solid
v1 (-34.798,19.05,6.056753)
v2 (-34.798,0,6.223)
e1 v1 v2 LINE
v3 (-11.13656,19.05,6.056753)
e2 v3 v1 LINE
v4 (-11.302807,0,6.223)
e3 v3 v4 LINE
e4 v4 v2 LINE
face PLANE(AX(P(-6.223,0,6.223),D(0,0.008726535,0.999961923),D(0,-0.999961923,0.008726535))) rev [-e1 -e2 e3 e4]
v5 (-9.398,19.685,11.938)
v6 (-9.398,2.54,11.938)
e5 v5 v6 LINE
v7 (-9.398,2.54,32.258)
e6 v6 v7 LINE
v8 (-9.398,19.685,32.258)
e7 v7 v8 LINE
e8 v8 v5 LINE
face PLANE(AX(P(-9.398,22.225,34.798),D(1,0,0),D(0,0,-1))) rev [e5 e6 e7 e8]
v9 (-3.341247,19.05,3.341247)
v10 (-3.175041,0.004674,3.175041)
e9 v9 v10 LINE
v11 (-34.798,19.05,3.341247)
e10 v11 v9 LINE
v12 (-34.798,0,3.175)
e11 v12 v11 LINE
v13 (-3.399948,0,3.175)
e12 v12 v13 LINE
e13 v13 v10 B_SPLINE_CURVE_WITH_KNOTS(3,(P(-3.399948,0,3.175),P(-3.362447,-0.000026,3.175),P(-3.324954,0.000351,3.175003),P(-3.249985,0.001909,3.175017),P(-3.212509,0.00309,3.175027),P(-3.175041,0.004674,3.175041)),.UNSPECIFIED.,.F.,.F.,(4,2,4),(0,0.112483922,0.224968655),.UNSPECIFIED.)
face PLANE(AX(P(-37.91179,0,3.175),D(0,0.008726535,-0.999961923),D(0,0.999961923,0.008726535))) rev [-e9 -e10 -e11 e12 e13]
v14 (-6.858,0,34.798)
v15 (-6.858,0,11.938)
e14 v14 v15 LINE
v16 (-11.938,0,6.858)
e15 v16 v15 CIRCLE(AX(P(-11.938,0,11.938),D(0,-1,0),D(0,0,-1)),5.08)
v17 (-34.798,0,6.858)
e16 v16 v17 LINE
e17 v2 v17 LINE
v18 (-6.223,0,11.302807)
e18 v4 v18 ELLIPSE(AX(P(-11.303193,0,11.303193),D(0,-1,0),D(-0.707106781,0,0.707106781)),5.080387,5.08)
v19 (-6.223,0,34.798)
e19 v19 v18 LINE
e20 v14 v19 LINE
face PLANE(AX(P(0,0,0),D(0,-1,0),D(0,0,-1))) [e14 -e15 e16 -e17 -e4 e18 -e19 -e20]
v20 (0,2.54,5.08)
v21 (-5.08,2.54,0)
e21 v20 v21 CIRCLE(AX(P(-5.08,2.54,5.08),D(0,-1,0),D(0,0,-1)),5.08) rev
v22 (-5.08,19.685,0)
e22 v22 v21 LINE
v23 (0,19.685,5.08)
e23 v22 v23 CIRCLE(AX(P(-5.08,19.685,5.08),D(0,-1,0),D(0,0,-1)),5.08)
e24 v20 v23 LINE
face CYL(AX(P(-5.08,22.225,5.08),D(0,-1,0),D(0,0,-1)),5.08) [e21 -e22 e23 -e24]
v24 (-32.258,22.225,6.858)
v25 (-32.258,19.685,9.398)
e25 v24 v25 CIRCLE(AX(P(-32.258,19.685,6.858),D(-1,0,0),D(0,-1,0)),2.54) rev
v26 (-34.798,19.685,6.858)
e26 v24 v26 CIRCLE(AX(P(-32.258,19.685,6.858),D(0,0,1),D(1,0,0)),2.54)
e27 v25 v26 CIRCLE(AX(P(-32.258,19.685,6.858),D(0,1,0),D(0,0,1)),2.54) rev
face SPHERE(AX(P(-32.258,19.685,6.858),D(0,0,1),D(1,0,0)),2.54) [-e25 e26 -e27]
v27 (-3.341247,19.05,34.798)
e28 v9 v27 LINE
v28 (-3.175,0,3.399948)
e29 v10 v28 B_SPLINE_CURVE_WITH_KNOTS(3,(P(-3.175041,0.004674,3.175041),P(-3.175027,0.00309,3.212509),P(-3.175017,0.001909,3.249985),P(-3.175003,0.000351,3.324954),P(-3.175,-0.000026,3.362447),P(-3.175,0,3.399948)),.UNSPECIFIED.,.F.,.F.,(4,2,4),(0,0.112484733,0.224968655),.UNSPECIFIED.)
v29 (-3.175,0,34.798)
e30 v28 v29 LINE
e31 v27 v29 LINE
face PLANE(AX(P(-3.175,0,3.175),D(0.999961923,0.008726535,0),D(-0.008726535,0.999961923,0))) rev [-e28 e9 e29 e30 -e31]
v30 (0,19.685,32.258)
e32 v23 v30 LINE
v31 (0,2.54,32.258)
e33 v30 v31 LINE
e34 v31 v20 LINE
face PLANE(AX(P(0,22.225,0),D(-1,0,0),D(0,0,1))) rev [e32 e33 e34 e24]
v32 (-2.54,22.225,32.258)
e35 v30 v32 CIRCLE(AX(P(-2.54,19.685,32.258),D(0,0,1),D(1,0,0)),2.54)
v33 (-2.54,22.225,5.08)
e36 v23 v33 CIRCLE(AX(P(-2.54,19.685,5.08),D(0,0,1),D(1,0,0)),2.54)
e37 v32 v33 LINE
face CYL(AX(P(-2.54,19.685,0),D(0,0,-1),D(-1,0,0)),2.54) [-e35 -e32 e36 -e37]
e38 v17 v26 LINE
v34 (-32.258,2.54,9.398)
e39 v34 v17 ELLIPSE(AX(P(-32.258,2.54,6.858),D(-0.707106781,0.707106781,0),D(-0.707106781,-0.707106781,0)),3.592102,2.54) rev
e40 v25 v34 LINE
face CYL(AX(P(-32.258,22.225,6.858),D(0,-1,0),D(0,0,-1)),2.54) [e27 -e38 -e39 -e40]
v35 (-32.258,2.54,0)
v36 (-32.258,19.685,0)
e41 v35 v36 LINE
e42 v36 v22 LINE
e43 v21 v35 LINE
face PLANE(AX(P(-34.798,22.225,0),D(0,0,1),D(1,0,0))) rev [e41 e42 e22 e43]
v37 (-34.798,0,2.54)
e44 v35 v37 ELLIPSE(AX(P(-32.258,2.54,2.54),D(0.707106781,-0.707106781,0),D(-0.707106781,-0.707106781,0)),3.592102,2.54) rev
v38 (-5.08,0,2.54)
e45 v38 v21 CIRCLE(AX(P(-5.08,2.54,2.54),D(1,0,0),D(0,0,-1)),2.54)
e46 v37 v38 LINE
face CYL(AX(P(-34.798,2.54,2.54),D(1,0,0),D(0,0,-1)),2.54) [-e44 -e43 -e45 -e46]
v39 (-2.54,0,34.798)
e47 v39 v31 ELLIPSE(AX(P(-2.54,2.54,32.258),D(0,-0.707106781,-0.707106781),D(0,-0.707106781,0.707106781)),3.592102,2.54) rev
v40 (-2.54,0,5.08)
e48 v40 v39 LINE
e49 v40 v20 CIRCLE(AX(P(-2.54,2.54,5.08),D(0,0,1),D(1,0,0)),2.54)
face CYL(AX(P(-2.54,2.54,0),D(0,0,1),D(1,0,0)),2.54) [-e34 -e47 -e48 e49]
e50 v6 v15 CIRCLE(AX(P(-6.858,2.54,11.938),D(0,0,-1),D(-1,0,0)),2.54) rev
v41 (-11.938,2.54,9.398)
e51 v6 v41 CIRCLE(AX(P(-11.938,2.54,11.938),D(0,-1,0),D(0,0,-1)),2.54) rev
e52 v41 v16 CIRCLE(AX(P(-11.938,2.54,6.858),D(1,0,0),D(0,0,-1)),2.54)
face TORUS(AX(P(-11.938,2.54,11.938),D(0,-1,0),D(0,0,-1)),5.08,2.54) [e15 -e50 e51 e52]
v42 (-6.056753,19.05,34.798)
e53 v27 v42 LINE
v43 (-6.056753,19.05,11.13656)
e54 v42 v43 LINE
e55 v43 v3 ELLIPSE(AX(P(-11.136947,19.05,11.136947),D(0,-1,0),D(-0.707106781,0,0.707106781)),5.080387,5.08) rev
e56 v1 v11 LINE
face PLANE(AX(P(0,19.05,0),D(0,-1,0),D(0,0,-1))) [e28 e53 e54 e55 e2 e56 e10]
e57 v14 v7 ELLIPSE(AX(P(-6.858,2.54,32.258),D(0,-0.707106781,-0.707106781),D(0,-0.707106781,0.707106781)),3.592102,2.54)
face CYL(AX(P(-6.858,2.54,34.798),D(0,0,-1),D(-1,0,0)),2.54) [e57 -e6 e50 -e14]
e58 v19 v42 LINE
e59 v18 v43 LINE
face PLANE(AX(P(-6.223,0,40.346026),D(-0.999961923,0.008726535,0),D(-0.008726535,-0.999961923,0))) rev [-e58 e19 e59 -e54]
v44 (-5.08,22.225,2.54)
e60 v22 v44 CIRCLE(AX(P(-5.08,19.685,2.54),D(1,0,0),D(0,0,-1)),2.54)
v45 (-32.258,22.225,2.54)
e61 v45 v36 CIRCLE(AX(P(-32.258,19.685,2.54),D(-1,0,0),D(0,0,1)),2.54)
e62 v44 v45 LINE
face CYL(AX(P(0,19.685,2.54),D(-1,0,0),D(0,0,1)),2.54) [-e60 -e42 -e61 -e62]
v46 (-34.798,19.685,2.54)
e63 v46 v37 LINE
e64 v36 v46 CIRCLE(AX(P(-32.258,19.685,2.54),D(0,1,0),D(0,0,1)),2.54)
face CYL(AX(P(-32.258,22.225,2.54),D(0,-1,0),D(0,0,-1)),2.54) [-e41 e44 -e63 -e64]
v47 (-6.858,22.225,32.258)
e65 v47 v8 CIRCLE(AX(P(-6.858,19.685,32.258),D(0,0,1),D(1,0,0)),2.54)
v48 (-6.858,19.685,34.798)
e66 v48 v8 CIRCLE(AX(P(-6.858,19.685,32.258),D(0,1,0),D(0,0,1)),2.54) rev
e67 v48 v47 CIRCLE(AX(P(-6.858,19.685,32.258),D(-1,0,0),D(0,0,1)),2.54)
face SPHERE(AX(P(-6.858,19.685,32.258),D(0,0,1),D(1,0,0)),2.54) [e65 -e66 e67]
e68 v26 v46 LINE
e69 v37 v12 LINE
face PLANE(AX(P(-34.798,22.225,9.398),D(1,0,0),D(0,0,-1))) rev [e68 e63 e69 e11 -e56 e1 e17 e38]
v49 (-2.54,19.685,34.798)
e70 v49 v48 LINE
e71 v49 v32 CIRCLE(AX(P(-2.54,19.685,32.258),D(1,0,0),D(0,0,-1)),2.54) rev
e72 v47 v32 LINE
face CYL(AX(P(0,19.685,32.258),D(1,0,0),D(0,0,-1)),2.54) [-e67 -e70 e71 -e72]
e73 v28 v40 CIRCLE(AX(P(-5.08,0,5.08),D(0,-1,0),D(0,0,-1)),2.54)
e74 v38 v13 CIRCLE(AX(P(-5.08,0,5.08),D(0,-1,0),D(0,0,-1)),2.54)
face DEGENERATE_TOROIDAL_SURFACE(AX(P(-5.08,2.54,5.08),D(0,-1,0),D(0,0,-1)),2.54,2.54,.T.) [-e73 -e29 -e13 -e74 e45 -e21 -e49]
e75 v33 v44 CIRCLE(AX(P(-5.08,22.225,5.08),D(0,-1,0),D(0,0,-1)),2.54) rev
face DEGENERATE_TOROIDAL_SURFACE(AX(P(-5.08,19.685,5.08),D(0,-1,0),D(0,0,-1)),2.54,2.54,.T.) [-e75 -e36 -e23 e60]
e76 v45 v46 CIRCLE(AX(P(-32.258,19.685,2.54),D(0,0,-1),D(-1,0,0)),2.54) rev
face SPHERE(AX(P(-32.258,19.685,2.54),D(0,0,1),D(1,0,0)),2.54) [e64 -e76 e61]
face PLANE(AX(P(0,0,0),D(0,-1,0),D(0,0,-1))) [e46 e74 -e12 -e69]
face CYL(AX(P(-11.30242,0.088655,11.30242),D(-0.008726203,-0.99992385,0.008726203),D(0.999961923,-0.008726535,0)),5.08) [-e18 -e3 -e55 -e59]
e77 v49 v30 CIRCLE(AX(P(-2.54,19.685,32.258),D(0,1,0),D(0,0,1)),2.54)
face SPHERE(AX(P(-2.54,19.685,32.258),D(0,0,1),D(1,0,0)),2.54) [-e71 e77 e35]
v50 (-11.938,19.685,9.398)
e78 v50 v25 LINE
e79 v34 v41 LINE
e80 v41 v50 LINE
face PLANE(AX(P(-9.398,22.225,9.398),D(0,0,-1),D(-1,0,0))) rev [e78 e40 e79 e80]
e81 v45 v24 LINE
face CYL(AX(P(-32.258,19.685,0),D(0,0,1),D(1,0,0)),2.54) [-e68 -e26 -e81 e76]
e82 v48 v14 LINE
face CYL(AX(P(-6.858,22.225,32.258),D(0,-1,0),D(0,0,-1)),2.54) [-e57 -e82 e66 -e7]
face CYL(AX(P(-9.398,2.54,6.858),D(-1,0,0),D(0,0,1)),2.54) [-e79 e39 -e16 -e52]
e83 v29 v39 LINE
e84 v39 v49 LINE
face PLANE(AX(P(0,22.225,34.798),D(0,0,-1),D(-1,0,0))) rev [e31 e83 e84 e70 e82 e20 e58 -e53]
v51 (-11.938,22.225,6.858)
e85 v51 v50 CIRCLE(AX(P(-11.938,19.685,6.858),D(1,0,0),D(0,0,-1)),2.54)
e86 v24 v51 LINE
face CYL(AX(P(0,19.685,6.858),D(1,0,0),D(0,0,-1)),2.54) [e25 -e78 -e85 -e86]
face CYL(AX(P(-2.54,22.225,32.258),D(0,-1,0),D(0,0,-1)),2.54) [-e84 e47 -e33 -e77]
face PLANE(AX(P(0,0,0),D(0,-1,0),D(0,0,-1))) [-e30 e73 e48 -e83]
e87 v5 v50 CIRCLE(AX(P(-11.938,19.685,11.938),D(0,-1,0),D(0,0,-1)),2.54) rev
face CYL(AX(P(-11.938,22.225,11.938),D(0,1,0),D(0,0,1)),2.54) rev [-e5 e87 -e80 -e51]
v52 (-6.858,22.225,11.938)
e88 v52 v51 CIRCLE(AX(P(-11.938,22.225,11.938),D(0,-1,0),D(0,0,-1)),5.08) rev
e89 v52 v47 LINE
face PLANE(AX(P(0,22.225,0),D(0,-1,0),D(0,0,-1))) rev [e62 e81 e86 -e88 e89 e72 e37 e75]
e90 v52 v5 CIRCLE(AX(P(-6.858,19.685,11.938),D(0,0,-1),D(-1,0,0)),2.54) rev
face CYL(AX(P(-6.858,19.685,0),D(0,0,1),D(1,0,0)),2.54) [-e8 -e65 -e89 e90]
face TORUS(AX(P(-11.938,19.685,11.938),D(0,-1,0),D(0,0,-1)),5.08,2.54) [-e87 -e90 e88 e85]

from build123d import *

# Parameters (mm, degrees)
BOSS_EXTRUDE1_DEPTH = 22.225
CUT_EXTRUDE1_DEPTH  = 19.05
CUT_EXTRUDE1_DRAFT  = -0.5
FILLET1_R           = 5.08
FILLET2_R           = 2.54


with BuildPart() as part:
    # Sketch1 → Boss-Extrude1 (new body)
    with BuildSketch(Plane(origin=(0, 0, 0), x_dir=(1, 0, 0), z_dir=(0, 1, 0))):
        Polygon((-34.798, 0), (0, 0), (0, -34.798), (-9.398, -34.798), (-9.398, -9.398), (-34.798, -9.398), align=None)
    extrude(amount=BOSS_EXTRUDE1_DEPTH)


with BuildPart() as cut_extrude1_tool:
    # Sketch2 → Cut-Extrude1 (with draft: the straight prism first)
    with BuildSketch(Plane.XZ):
        Polygon((-3.175, 40.346025657), (-6.223, 40.346025657), (-6.223, 6.223), (-37.911790098, 6.223), (-37.911790098, 3.175), (-3.175, 3.175), align=None)
    extrude(amount=-CUT_EXTRUDE1_DEPTH)
    # Cut-Extrude1: the draft: its side faces are tilted about the plane it starts from
    cut_extrude1_sides = [cut_extrude1_tool.faces().sort_by_distance(p)[0] for p in [
        (-4.699, 9.525, 40.346025657),
        (-6.223, 9.525, 23.284512829),
        (-22.067395049, 9.525, 6.223),
        (-37.911790098, 9.525, 4.699),
        (-20.543395049, 9.525, 3.175),
        (-3.175, 9.525, 21.760512829),
    ]]
    draft(cut_extrude1_sides, Plane.XZ, CUT_EXTRUDE1_DRAFT)


with BuildPart() as part_1:
    add(part.part)

    # Cut-Extrude1: cut by cut_extrude1_tool
    add(cut_extrude1_tool.part, mode=Mode.SUBTRACT)

    # Fillet1
    fillet1_edges = [part_1.edges().sort_by_distance(p)[0] for p in [
        (0, 11.1125, 0),
        (-6.139876584, 9.525, 6.139876584),
    ]]
    fillet(fillet1_edges, radius=FILLET1_R)

    # Fillet2
    # the kernel refuses this fillet: 2.54 mm, written as the material it adds along each edge
    with BuildSketch(Plane(origin=(-9.398, 0, 9.398), x_dir=(-1, 0, 0), z_dir=(0, 1, 0))) as fillet2_piece_1:
        with BuildLine():
            CenterArc((FILLET2_R, FILLET2_R), FILLET2_R, 180, 90)
            Line((0, FILLET2_R), (0, 0))
            Line((0, 0), (FILLET2_R, 0))
        make_face()
    extrude(amount=22.225)
    # the kernel refuses this fillet: 2.54 mm, written as the material it takes off along each edge
    with BuildSketch(Plane(origin=(-32.258, 19.685, 2.54), x_dir=(-1, 0, 0), z_dir=(0, 0, -1))) as fillet2_2_piece_1_section:
        Polygon((0, 0), (FILLET2_R, 0), (FILLET2_R, FILLET2_R), (0, FILLET2_R), align=None)
    fillet2_2_piece_1 = extrude(amount=FILLET2_R, mode=Mode.PRIVATE)
    fillet2_2_piece_1 = fillet2_2_piece_1 - Plane(origin=(-32.258, 19.685, 2.54), x_dir=(0.7071067811865475, -0.7071067811865475, 0), z_dir=(0, 0, -1)) * Sphere(FILLET2_R, mode=Mode.PRIVATE)
    add(fillet2_2_piece_1, mode=Mode.SUBTRACT)
    with BuildSketch(Plane(origin=(-2.54, 19.685, 32.258), x_dir=(1, 0, 0), z_dir=(0, 1, 0))) as fillet2_2_piece_2_section:
        Polygon((0, 0), (FILLET2_R, 0), (FILLET2_R, -FILLET2_R), (0, -FILLET2_R), align=None)
    fillet2_2_piece_2 = extrude(amount=FILLET2_R, mode=Mode.PRIVATE)
    fillet2_2_piece_2 = fillet2_2_piece_2 - Plane(origin=(-2.54, 19.685, 32.258), x_dir=(-0.7071067811865478, 0, -0.7071067811865471), z_dir=(0, 1, 0)) * Sphere(FILLET2_R, mode=Mode.PRIVATE)
    add(fillet2_2_piece_2, mode=Mode.SUBTRACT)
    with BuildSketch(Plane(origin=(-6.858, 19.685, 32.258), x_dir=(-1, 0, 0), z_dir=(0, 1, 0))) as fillet2_2_piece_3_section:
        Polygon((0, 0), (FILLET2_R, 0), (FILLET2_R, FILLET2_R), (0, FILLET2_R), align=None)
    fillet2_2_piece_3 = extrude(amount=FILLET2_R, mode=Mode.PRIVATE)
    fillet2_2_piece_3 = fillet2_2_piece_3 - Plane(origin=(-6.858, 19.685, 32.258), x_dir=(0.7071067811865471, 0, -0.7071067811865479), z_dir=(0, 1, 0)) * Sphere(FILLET2_R, mode=Mode.PRIVATE)
    add(fillet2_2_piece_3, mode=Mode.SUBTRACT)
    with BuildSketch(Plane(origin=(-32.258, 19.685, 6.858), x_dir=(0, 0, 1), z_dir=(-1, 0, 0))) as fillet2_2_piece_4_section:
        Polygon((0, 0), (FILLET2_R, 0), (FILLET2_R, FILLET2_R), (0, FILLET2_R), align=None)
    fillet2_2_piece_4 = extrude(amount=FILLET2_R, mode=Mode.PRIVATE)
    fillet2_2_piece_4 = fillet2_2_piece_4 - Plane(origin=(-32.258, 19.685, 6.858), x_dir=(0, -0.7071067811865475, -0.7071067811865475), z_dir=(-1, 0, 0)) * Sphere(FILLET2_R, mode=Mode.PRIVATE)
    add(fillet2_2_piece_4, mode=Mode.SUBTRACT)
    with BuildSketch(Plane(origin=(-34.798, -6.35, 0), x_dir=(1, 0, 0), z_dir=(0, 1, 0)), Plane(origin=(-34.798, -6.35, 9.398), x_dir=(0, 0, -1), z_dir=(0, 1, 0))) as fillet2_2_piece_5:
        with BuildLine():
            CenterArc((FILLET2_R, -FILLET2_R), FILLET2_R, 90, 90)
            Line((0, -FILLET2_R), (0, 0))
            Line((0, 0), (FILLET2_R, 0))
        make_face()
    extrude(amount=26.035, mode=Mode.SUBTRACT)
    with BuildSketch(Plane(origin=(0, -6.35, 34.798), x_dir=(0, 0, -1), z_dir=(0, 1, 0)), Plane(origin=(-9.398, -6.35, 34.798), x_dir=(1, 0, 0), z_dir=(0, 1, 0))) as fillet2_2_piece_6:
        with BuildLine():
            CenterArc((FILLET2_R, FILLET2_R), FILLET2_R, 180, 90)
            Line((0, FILLET2_R), (0, 0))
            Line((0, 0), (FILLET2_R, 0))
        make_face()
    extrude(amount=26.035, mode=Mode.SUBTRACT)
    with BuildSketch(Plane(origin=(-9.398, 22.225, 32.258), x_dir=(1, 0, 0), z_dir=(0, 0, -1)), Plane(origin=(-11.938, 22.225, 9.398), x_dir=(0, 0, -1), z_dir=(-1, 0, 0))) as fillet2_2_piece_7:
        with BuildLine():
            CenterArc((FILLET2_R, FILLET2_R), FILLET2_R, 180, 90)
            Line((0, FILLET2_R), (0, 0))
            Line((0, 0), (FILLET2_R, 0))
        make_face()
    extrude(amount=20.32, mode=Mode.SUBTRACT)
    with BuildSketch(Plane(origin=(-2.54, 22.225, 34.798), x_dir=(0, 0, -1), z_dir=(-1, 0, 0))) as fillet2_2_piece_8:
        with BuildLine():
            CenterArc((FILLET2_R, FILLET2_R), FILLET2_R, 180, 90)
            Line((0, FILLET2_R), (0, 0))
            Line((0, 0), (FILLET2_R, 0))
        make_face()
    extrude(amount=4.318, mode=Mode.SUBTRACT)
    with BuildSketch(Plane(origin=(0, 22.225, 5.08), x_dir=(-1, 0, 0), z_dir=(0, 0, 1))) as fillet2_2_piece_9:
        with BuildLine():
            CenterArc((FILLET2_R, FILLET2_R), FILLET2_R, 180, 90)
            Line((0, FILLET2_R), (0, 0))
            Line((0, 0), (FILLET2_R, 0))
        make_face()
    extrude(amount=27.178, mode=Mode.SUBTRACT)
    with BuildSketch(Plane(origin=(-41.148, 0, 0), x_dir=(0, 1, 0), z_dir=(1, 0, 0))) as fillet2_2_piece_10:
        with BuildLine():
            CenterArc((FILLET2_R, FILLET2_R), FILLET2_R, 180, 90)
            Line((0, FILLET2_R), (0, 0))
            Line((0, 0), (FILLET2_R, 0))
        make_face()
    extrude(amount=36.068, mode=Mode.SUBTRACT)
    with BuildSketch(Plane(origin=(-32.258, 22.225, 0), x_dir=(0, -1, 0), z_dir=(1, 0, 0))) as fillet2_2_piece_11:
        with BuildLine():
            CenterArc((FILLET2_R, -FILLET2_R), FILLET2_R, 90, 90)
            Line((0, -FILLET2_R), (0, 0))
            Line((0, 0), (FILLET2_R, 0))
        make_face()
    extrude(amount=27.178, mode=Mode.SUBTRACT)
    with BuildSketch(Plane(origin=(-34.798, 22.225, 6.858), x_dir=(0, -1, 0), z_dir=(0, 0, -1))) as fillet2_2_piece_12:
        with BuildLine():
            CenterArc((FILLET2_R, -FILLET2_R), FILLET2_R, 90, 90)
            Line((0, -FILLET2_R), (0, 0))
            Line((0, 0), (FILLET2_R, 0))
        make_face()
    extrude(amount=4.318, mode=Mode.SUBTRACT)
    with BuildSketch(Plane(origin=(-5.08, 0, 5.08), x_dir=(0, 0, -1), z_dir=(-1, 0, 0))) as fillet2_2_piece_13:
        with BuildLine():
            CenterArc((5.08 - FILLET2_R, -FILLET2_R), FILLET2_R, 0, 90)
            Line((5.08, -FILLET2_R), (5.08, 0))
            Line((5.08, 0), (5.08 - FILLET2_R, 0))
        make_face()
    revolve(axis=Axis((-5.08, 0, 5.08), (0, -1, 0)), revolution_arc=90, mode=Mode.SUBTRACT)
    with BuildSketch(Plane(origin=(-5.08, 22.225, 5.08), x_dir=(0, 0, -1), z_dir=(-1, 0, 0))) as fillet2_2_piece_14:
        with BuildLine():
            CenterArc((5.08 - FILLET2_R, FILLET2_R), FILLET2_R, 270, 90)
            Line((5.08 - FILLET2_R, 0), (5.08, 0))
            Line((5.08, 0), (5.08, FILLET2_R))
        make_face()
    revolve(axis=Axis((-5.08, 22.225, 5.08), (0, -1, 0)), revolution_arc=90, mode=Mode.SUBTRACT)
    with BuildSketch(Plane(origin=(0, 0, 5.08), x_dir=(-1, 0, 0), z_dir=(0, 0, 1))) as fillet2_2_piece_15:
        with BuildLine():
            CenterArc((FILLET2_R, -FILLET2_R), FILLET2_R, 90, 90)
            Line((0, -FILLET2_R), (0, 0))
            Line((0, 0), (FILLET2_R, 0))
        make_face()
    extrude(amount=36.068, mode=Mode.SUBTRACT)
    with BuildSketch(Plane(origin=(-9.398, 0, 41.148), x_dir=(1, 0, 0), z_dir=(0, 0, -1)), Plane(origin=(-11.938, 0, 9.398), x_dir=(0, 0, -1), z_dir=(-1, 0, 0))) as fillet2_2_piece_16:
        with BuildLine():
            CenterArc((FILLET2_R, -FILLET2_R), FILLET2_R, 90, 90)
            Line((0, -FILLET2_R), (0, 0))
            Line((0, 0), (FILLET2_R, 0))
        make_face()
    extrude(amount=29.21, mode=Mode.SUBTRACT)
    with BuildSketch(Plane(origin=(-11.938, 22.225, 11.938), x_dir=(0, 0, -1), z_dir=(-1, 0, 0))) as fillet2_2_piece_17:
        with BuildLine():
            CenterArc((2.54 + FILLET2_R, FILLET2_R), FILLET2_R, 180, 90)
            Line((2.54, FILLET2_R), (2.54, 0))
            Line((2.54, 0), (2.54 + FILLET2_R, 0))
        make_face()
    revolve(axis=Axis((-11.938, 22.225, 11.938), (0, -1, 0)), revolution_arc=90, mode=Mode.SUBTRACT)
    with BuildSketch(Plane(origin=(-11.938, 0, 11.938), x_dir=(0, 0, -1), z_dir=(-1, 0, 0))) as fillet2_2_piece_18:
        with BuildLine():
            CenterArc((2.54 + FILLET2_R, -FILLET2_R), FILLET2_R, 90, 90)
            Line((2.54, -FILLET2_R), (2.54, 0))
            Line((2.54, 0), (2.54 + FILLET2_R, 0))
        make_face()
    revolve(axis=Axis((-11.938, 0, 11.938), (0, -1, 0)), revolution_arc=90, mode=Mode.SUBTRACT)


solid = part_1.part
